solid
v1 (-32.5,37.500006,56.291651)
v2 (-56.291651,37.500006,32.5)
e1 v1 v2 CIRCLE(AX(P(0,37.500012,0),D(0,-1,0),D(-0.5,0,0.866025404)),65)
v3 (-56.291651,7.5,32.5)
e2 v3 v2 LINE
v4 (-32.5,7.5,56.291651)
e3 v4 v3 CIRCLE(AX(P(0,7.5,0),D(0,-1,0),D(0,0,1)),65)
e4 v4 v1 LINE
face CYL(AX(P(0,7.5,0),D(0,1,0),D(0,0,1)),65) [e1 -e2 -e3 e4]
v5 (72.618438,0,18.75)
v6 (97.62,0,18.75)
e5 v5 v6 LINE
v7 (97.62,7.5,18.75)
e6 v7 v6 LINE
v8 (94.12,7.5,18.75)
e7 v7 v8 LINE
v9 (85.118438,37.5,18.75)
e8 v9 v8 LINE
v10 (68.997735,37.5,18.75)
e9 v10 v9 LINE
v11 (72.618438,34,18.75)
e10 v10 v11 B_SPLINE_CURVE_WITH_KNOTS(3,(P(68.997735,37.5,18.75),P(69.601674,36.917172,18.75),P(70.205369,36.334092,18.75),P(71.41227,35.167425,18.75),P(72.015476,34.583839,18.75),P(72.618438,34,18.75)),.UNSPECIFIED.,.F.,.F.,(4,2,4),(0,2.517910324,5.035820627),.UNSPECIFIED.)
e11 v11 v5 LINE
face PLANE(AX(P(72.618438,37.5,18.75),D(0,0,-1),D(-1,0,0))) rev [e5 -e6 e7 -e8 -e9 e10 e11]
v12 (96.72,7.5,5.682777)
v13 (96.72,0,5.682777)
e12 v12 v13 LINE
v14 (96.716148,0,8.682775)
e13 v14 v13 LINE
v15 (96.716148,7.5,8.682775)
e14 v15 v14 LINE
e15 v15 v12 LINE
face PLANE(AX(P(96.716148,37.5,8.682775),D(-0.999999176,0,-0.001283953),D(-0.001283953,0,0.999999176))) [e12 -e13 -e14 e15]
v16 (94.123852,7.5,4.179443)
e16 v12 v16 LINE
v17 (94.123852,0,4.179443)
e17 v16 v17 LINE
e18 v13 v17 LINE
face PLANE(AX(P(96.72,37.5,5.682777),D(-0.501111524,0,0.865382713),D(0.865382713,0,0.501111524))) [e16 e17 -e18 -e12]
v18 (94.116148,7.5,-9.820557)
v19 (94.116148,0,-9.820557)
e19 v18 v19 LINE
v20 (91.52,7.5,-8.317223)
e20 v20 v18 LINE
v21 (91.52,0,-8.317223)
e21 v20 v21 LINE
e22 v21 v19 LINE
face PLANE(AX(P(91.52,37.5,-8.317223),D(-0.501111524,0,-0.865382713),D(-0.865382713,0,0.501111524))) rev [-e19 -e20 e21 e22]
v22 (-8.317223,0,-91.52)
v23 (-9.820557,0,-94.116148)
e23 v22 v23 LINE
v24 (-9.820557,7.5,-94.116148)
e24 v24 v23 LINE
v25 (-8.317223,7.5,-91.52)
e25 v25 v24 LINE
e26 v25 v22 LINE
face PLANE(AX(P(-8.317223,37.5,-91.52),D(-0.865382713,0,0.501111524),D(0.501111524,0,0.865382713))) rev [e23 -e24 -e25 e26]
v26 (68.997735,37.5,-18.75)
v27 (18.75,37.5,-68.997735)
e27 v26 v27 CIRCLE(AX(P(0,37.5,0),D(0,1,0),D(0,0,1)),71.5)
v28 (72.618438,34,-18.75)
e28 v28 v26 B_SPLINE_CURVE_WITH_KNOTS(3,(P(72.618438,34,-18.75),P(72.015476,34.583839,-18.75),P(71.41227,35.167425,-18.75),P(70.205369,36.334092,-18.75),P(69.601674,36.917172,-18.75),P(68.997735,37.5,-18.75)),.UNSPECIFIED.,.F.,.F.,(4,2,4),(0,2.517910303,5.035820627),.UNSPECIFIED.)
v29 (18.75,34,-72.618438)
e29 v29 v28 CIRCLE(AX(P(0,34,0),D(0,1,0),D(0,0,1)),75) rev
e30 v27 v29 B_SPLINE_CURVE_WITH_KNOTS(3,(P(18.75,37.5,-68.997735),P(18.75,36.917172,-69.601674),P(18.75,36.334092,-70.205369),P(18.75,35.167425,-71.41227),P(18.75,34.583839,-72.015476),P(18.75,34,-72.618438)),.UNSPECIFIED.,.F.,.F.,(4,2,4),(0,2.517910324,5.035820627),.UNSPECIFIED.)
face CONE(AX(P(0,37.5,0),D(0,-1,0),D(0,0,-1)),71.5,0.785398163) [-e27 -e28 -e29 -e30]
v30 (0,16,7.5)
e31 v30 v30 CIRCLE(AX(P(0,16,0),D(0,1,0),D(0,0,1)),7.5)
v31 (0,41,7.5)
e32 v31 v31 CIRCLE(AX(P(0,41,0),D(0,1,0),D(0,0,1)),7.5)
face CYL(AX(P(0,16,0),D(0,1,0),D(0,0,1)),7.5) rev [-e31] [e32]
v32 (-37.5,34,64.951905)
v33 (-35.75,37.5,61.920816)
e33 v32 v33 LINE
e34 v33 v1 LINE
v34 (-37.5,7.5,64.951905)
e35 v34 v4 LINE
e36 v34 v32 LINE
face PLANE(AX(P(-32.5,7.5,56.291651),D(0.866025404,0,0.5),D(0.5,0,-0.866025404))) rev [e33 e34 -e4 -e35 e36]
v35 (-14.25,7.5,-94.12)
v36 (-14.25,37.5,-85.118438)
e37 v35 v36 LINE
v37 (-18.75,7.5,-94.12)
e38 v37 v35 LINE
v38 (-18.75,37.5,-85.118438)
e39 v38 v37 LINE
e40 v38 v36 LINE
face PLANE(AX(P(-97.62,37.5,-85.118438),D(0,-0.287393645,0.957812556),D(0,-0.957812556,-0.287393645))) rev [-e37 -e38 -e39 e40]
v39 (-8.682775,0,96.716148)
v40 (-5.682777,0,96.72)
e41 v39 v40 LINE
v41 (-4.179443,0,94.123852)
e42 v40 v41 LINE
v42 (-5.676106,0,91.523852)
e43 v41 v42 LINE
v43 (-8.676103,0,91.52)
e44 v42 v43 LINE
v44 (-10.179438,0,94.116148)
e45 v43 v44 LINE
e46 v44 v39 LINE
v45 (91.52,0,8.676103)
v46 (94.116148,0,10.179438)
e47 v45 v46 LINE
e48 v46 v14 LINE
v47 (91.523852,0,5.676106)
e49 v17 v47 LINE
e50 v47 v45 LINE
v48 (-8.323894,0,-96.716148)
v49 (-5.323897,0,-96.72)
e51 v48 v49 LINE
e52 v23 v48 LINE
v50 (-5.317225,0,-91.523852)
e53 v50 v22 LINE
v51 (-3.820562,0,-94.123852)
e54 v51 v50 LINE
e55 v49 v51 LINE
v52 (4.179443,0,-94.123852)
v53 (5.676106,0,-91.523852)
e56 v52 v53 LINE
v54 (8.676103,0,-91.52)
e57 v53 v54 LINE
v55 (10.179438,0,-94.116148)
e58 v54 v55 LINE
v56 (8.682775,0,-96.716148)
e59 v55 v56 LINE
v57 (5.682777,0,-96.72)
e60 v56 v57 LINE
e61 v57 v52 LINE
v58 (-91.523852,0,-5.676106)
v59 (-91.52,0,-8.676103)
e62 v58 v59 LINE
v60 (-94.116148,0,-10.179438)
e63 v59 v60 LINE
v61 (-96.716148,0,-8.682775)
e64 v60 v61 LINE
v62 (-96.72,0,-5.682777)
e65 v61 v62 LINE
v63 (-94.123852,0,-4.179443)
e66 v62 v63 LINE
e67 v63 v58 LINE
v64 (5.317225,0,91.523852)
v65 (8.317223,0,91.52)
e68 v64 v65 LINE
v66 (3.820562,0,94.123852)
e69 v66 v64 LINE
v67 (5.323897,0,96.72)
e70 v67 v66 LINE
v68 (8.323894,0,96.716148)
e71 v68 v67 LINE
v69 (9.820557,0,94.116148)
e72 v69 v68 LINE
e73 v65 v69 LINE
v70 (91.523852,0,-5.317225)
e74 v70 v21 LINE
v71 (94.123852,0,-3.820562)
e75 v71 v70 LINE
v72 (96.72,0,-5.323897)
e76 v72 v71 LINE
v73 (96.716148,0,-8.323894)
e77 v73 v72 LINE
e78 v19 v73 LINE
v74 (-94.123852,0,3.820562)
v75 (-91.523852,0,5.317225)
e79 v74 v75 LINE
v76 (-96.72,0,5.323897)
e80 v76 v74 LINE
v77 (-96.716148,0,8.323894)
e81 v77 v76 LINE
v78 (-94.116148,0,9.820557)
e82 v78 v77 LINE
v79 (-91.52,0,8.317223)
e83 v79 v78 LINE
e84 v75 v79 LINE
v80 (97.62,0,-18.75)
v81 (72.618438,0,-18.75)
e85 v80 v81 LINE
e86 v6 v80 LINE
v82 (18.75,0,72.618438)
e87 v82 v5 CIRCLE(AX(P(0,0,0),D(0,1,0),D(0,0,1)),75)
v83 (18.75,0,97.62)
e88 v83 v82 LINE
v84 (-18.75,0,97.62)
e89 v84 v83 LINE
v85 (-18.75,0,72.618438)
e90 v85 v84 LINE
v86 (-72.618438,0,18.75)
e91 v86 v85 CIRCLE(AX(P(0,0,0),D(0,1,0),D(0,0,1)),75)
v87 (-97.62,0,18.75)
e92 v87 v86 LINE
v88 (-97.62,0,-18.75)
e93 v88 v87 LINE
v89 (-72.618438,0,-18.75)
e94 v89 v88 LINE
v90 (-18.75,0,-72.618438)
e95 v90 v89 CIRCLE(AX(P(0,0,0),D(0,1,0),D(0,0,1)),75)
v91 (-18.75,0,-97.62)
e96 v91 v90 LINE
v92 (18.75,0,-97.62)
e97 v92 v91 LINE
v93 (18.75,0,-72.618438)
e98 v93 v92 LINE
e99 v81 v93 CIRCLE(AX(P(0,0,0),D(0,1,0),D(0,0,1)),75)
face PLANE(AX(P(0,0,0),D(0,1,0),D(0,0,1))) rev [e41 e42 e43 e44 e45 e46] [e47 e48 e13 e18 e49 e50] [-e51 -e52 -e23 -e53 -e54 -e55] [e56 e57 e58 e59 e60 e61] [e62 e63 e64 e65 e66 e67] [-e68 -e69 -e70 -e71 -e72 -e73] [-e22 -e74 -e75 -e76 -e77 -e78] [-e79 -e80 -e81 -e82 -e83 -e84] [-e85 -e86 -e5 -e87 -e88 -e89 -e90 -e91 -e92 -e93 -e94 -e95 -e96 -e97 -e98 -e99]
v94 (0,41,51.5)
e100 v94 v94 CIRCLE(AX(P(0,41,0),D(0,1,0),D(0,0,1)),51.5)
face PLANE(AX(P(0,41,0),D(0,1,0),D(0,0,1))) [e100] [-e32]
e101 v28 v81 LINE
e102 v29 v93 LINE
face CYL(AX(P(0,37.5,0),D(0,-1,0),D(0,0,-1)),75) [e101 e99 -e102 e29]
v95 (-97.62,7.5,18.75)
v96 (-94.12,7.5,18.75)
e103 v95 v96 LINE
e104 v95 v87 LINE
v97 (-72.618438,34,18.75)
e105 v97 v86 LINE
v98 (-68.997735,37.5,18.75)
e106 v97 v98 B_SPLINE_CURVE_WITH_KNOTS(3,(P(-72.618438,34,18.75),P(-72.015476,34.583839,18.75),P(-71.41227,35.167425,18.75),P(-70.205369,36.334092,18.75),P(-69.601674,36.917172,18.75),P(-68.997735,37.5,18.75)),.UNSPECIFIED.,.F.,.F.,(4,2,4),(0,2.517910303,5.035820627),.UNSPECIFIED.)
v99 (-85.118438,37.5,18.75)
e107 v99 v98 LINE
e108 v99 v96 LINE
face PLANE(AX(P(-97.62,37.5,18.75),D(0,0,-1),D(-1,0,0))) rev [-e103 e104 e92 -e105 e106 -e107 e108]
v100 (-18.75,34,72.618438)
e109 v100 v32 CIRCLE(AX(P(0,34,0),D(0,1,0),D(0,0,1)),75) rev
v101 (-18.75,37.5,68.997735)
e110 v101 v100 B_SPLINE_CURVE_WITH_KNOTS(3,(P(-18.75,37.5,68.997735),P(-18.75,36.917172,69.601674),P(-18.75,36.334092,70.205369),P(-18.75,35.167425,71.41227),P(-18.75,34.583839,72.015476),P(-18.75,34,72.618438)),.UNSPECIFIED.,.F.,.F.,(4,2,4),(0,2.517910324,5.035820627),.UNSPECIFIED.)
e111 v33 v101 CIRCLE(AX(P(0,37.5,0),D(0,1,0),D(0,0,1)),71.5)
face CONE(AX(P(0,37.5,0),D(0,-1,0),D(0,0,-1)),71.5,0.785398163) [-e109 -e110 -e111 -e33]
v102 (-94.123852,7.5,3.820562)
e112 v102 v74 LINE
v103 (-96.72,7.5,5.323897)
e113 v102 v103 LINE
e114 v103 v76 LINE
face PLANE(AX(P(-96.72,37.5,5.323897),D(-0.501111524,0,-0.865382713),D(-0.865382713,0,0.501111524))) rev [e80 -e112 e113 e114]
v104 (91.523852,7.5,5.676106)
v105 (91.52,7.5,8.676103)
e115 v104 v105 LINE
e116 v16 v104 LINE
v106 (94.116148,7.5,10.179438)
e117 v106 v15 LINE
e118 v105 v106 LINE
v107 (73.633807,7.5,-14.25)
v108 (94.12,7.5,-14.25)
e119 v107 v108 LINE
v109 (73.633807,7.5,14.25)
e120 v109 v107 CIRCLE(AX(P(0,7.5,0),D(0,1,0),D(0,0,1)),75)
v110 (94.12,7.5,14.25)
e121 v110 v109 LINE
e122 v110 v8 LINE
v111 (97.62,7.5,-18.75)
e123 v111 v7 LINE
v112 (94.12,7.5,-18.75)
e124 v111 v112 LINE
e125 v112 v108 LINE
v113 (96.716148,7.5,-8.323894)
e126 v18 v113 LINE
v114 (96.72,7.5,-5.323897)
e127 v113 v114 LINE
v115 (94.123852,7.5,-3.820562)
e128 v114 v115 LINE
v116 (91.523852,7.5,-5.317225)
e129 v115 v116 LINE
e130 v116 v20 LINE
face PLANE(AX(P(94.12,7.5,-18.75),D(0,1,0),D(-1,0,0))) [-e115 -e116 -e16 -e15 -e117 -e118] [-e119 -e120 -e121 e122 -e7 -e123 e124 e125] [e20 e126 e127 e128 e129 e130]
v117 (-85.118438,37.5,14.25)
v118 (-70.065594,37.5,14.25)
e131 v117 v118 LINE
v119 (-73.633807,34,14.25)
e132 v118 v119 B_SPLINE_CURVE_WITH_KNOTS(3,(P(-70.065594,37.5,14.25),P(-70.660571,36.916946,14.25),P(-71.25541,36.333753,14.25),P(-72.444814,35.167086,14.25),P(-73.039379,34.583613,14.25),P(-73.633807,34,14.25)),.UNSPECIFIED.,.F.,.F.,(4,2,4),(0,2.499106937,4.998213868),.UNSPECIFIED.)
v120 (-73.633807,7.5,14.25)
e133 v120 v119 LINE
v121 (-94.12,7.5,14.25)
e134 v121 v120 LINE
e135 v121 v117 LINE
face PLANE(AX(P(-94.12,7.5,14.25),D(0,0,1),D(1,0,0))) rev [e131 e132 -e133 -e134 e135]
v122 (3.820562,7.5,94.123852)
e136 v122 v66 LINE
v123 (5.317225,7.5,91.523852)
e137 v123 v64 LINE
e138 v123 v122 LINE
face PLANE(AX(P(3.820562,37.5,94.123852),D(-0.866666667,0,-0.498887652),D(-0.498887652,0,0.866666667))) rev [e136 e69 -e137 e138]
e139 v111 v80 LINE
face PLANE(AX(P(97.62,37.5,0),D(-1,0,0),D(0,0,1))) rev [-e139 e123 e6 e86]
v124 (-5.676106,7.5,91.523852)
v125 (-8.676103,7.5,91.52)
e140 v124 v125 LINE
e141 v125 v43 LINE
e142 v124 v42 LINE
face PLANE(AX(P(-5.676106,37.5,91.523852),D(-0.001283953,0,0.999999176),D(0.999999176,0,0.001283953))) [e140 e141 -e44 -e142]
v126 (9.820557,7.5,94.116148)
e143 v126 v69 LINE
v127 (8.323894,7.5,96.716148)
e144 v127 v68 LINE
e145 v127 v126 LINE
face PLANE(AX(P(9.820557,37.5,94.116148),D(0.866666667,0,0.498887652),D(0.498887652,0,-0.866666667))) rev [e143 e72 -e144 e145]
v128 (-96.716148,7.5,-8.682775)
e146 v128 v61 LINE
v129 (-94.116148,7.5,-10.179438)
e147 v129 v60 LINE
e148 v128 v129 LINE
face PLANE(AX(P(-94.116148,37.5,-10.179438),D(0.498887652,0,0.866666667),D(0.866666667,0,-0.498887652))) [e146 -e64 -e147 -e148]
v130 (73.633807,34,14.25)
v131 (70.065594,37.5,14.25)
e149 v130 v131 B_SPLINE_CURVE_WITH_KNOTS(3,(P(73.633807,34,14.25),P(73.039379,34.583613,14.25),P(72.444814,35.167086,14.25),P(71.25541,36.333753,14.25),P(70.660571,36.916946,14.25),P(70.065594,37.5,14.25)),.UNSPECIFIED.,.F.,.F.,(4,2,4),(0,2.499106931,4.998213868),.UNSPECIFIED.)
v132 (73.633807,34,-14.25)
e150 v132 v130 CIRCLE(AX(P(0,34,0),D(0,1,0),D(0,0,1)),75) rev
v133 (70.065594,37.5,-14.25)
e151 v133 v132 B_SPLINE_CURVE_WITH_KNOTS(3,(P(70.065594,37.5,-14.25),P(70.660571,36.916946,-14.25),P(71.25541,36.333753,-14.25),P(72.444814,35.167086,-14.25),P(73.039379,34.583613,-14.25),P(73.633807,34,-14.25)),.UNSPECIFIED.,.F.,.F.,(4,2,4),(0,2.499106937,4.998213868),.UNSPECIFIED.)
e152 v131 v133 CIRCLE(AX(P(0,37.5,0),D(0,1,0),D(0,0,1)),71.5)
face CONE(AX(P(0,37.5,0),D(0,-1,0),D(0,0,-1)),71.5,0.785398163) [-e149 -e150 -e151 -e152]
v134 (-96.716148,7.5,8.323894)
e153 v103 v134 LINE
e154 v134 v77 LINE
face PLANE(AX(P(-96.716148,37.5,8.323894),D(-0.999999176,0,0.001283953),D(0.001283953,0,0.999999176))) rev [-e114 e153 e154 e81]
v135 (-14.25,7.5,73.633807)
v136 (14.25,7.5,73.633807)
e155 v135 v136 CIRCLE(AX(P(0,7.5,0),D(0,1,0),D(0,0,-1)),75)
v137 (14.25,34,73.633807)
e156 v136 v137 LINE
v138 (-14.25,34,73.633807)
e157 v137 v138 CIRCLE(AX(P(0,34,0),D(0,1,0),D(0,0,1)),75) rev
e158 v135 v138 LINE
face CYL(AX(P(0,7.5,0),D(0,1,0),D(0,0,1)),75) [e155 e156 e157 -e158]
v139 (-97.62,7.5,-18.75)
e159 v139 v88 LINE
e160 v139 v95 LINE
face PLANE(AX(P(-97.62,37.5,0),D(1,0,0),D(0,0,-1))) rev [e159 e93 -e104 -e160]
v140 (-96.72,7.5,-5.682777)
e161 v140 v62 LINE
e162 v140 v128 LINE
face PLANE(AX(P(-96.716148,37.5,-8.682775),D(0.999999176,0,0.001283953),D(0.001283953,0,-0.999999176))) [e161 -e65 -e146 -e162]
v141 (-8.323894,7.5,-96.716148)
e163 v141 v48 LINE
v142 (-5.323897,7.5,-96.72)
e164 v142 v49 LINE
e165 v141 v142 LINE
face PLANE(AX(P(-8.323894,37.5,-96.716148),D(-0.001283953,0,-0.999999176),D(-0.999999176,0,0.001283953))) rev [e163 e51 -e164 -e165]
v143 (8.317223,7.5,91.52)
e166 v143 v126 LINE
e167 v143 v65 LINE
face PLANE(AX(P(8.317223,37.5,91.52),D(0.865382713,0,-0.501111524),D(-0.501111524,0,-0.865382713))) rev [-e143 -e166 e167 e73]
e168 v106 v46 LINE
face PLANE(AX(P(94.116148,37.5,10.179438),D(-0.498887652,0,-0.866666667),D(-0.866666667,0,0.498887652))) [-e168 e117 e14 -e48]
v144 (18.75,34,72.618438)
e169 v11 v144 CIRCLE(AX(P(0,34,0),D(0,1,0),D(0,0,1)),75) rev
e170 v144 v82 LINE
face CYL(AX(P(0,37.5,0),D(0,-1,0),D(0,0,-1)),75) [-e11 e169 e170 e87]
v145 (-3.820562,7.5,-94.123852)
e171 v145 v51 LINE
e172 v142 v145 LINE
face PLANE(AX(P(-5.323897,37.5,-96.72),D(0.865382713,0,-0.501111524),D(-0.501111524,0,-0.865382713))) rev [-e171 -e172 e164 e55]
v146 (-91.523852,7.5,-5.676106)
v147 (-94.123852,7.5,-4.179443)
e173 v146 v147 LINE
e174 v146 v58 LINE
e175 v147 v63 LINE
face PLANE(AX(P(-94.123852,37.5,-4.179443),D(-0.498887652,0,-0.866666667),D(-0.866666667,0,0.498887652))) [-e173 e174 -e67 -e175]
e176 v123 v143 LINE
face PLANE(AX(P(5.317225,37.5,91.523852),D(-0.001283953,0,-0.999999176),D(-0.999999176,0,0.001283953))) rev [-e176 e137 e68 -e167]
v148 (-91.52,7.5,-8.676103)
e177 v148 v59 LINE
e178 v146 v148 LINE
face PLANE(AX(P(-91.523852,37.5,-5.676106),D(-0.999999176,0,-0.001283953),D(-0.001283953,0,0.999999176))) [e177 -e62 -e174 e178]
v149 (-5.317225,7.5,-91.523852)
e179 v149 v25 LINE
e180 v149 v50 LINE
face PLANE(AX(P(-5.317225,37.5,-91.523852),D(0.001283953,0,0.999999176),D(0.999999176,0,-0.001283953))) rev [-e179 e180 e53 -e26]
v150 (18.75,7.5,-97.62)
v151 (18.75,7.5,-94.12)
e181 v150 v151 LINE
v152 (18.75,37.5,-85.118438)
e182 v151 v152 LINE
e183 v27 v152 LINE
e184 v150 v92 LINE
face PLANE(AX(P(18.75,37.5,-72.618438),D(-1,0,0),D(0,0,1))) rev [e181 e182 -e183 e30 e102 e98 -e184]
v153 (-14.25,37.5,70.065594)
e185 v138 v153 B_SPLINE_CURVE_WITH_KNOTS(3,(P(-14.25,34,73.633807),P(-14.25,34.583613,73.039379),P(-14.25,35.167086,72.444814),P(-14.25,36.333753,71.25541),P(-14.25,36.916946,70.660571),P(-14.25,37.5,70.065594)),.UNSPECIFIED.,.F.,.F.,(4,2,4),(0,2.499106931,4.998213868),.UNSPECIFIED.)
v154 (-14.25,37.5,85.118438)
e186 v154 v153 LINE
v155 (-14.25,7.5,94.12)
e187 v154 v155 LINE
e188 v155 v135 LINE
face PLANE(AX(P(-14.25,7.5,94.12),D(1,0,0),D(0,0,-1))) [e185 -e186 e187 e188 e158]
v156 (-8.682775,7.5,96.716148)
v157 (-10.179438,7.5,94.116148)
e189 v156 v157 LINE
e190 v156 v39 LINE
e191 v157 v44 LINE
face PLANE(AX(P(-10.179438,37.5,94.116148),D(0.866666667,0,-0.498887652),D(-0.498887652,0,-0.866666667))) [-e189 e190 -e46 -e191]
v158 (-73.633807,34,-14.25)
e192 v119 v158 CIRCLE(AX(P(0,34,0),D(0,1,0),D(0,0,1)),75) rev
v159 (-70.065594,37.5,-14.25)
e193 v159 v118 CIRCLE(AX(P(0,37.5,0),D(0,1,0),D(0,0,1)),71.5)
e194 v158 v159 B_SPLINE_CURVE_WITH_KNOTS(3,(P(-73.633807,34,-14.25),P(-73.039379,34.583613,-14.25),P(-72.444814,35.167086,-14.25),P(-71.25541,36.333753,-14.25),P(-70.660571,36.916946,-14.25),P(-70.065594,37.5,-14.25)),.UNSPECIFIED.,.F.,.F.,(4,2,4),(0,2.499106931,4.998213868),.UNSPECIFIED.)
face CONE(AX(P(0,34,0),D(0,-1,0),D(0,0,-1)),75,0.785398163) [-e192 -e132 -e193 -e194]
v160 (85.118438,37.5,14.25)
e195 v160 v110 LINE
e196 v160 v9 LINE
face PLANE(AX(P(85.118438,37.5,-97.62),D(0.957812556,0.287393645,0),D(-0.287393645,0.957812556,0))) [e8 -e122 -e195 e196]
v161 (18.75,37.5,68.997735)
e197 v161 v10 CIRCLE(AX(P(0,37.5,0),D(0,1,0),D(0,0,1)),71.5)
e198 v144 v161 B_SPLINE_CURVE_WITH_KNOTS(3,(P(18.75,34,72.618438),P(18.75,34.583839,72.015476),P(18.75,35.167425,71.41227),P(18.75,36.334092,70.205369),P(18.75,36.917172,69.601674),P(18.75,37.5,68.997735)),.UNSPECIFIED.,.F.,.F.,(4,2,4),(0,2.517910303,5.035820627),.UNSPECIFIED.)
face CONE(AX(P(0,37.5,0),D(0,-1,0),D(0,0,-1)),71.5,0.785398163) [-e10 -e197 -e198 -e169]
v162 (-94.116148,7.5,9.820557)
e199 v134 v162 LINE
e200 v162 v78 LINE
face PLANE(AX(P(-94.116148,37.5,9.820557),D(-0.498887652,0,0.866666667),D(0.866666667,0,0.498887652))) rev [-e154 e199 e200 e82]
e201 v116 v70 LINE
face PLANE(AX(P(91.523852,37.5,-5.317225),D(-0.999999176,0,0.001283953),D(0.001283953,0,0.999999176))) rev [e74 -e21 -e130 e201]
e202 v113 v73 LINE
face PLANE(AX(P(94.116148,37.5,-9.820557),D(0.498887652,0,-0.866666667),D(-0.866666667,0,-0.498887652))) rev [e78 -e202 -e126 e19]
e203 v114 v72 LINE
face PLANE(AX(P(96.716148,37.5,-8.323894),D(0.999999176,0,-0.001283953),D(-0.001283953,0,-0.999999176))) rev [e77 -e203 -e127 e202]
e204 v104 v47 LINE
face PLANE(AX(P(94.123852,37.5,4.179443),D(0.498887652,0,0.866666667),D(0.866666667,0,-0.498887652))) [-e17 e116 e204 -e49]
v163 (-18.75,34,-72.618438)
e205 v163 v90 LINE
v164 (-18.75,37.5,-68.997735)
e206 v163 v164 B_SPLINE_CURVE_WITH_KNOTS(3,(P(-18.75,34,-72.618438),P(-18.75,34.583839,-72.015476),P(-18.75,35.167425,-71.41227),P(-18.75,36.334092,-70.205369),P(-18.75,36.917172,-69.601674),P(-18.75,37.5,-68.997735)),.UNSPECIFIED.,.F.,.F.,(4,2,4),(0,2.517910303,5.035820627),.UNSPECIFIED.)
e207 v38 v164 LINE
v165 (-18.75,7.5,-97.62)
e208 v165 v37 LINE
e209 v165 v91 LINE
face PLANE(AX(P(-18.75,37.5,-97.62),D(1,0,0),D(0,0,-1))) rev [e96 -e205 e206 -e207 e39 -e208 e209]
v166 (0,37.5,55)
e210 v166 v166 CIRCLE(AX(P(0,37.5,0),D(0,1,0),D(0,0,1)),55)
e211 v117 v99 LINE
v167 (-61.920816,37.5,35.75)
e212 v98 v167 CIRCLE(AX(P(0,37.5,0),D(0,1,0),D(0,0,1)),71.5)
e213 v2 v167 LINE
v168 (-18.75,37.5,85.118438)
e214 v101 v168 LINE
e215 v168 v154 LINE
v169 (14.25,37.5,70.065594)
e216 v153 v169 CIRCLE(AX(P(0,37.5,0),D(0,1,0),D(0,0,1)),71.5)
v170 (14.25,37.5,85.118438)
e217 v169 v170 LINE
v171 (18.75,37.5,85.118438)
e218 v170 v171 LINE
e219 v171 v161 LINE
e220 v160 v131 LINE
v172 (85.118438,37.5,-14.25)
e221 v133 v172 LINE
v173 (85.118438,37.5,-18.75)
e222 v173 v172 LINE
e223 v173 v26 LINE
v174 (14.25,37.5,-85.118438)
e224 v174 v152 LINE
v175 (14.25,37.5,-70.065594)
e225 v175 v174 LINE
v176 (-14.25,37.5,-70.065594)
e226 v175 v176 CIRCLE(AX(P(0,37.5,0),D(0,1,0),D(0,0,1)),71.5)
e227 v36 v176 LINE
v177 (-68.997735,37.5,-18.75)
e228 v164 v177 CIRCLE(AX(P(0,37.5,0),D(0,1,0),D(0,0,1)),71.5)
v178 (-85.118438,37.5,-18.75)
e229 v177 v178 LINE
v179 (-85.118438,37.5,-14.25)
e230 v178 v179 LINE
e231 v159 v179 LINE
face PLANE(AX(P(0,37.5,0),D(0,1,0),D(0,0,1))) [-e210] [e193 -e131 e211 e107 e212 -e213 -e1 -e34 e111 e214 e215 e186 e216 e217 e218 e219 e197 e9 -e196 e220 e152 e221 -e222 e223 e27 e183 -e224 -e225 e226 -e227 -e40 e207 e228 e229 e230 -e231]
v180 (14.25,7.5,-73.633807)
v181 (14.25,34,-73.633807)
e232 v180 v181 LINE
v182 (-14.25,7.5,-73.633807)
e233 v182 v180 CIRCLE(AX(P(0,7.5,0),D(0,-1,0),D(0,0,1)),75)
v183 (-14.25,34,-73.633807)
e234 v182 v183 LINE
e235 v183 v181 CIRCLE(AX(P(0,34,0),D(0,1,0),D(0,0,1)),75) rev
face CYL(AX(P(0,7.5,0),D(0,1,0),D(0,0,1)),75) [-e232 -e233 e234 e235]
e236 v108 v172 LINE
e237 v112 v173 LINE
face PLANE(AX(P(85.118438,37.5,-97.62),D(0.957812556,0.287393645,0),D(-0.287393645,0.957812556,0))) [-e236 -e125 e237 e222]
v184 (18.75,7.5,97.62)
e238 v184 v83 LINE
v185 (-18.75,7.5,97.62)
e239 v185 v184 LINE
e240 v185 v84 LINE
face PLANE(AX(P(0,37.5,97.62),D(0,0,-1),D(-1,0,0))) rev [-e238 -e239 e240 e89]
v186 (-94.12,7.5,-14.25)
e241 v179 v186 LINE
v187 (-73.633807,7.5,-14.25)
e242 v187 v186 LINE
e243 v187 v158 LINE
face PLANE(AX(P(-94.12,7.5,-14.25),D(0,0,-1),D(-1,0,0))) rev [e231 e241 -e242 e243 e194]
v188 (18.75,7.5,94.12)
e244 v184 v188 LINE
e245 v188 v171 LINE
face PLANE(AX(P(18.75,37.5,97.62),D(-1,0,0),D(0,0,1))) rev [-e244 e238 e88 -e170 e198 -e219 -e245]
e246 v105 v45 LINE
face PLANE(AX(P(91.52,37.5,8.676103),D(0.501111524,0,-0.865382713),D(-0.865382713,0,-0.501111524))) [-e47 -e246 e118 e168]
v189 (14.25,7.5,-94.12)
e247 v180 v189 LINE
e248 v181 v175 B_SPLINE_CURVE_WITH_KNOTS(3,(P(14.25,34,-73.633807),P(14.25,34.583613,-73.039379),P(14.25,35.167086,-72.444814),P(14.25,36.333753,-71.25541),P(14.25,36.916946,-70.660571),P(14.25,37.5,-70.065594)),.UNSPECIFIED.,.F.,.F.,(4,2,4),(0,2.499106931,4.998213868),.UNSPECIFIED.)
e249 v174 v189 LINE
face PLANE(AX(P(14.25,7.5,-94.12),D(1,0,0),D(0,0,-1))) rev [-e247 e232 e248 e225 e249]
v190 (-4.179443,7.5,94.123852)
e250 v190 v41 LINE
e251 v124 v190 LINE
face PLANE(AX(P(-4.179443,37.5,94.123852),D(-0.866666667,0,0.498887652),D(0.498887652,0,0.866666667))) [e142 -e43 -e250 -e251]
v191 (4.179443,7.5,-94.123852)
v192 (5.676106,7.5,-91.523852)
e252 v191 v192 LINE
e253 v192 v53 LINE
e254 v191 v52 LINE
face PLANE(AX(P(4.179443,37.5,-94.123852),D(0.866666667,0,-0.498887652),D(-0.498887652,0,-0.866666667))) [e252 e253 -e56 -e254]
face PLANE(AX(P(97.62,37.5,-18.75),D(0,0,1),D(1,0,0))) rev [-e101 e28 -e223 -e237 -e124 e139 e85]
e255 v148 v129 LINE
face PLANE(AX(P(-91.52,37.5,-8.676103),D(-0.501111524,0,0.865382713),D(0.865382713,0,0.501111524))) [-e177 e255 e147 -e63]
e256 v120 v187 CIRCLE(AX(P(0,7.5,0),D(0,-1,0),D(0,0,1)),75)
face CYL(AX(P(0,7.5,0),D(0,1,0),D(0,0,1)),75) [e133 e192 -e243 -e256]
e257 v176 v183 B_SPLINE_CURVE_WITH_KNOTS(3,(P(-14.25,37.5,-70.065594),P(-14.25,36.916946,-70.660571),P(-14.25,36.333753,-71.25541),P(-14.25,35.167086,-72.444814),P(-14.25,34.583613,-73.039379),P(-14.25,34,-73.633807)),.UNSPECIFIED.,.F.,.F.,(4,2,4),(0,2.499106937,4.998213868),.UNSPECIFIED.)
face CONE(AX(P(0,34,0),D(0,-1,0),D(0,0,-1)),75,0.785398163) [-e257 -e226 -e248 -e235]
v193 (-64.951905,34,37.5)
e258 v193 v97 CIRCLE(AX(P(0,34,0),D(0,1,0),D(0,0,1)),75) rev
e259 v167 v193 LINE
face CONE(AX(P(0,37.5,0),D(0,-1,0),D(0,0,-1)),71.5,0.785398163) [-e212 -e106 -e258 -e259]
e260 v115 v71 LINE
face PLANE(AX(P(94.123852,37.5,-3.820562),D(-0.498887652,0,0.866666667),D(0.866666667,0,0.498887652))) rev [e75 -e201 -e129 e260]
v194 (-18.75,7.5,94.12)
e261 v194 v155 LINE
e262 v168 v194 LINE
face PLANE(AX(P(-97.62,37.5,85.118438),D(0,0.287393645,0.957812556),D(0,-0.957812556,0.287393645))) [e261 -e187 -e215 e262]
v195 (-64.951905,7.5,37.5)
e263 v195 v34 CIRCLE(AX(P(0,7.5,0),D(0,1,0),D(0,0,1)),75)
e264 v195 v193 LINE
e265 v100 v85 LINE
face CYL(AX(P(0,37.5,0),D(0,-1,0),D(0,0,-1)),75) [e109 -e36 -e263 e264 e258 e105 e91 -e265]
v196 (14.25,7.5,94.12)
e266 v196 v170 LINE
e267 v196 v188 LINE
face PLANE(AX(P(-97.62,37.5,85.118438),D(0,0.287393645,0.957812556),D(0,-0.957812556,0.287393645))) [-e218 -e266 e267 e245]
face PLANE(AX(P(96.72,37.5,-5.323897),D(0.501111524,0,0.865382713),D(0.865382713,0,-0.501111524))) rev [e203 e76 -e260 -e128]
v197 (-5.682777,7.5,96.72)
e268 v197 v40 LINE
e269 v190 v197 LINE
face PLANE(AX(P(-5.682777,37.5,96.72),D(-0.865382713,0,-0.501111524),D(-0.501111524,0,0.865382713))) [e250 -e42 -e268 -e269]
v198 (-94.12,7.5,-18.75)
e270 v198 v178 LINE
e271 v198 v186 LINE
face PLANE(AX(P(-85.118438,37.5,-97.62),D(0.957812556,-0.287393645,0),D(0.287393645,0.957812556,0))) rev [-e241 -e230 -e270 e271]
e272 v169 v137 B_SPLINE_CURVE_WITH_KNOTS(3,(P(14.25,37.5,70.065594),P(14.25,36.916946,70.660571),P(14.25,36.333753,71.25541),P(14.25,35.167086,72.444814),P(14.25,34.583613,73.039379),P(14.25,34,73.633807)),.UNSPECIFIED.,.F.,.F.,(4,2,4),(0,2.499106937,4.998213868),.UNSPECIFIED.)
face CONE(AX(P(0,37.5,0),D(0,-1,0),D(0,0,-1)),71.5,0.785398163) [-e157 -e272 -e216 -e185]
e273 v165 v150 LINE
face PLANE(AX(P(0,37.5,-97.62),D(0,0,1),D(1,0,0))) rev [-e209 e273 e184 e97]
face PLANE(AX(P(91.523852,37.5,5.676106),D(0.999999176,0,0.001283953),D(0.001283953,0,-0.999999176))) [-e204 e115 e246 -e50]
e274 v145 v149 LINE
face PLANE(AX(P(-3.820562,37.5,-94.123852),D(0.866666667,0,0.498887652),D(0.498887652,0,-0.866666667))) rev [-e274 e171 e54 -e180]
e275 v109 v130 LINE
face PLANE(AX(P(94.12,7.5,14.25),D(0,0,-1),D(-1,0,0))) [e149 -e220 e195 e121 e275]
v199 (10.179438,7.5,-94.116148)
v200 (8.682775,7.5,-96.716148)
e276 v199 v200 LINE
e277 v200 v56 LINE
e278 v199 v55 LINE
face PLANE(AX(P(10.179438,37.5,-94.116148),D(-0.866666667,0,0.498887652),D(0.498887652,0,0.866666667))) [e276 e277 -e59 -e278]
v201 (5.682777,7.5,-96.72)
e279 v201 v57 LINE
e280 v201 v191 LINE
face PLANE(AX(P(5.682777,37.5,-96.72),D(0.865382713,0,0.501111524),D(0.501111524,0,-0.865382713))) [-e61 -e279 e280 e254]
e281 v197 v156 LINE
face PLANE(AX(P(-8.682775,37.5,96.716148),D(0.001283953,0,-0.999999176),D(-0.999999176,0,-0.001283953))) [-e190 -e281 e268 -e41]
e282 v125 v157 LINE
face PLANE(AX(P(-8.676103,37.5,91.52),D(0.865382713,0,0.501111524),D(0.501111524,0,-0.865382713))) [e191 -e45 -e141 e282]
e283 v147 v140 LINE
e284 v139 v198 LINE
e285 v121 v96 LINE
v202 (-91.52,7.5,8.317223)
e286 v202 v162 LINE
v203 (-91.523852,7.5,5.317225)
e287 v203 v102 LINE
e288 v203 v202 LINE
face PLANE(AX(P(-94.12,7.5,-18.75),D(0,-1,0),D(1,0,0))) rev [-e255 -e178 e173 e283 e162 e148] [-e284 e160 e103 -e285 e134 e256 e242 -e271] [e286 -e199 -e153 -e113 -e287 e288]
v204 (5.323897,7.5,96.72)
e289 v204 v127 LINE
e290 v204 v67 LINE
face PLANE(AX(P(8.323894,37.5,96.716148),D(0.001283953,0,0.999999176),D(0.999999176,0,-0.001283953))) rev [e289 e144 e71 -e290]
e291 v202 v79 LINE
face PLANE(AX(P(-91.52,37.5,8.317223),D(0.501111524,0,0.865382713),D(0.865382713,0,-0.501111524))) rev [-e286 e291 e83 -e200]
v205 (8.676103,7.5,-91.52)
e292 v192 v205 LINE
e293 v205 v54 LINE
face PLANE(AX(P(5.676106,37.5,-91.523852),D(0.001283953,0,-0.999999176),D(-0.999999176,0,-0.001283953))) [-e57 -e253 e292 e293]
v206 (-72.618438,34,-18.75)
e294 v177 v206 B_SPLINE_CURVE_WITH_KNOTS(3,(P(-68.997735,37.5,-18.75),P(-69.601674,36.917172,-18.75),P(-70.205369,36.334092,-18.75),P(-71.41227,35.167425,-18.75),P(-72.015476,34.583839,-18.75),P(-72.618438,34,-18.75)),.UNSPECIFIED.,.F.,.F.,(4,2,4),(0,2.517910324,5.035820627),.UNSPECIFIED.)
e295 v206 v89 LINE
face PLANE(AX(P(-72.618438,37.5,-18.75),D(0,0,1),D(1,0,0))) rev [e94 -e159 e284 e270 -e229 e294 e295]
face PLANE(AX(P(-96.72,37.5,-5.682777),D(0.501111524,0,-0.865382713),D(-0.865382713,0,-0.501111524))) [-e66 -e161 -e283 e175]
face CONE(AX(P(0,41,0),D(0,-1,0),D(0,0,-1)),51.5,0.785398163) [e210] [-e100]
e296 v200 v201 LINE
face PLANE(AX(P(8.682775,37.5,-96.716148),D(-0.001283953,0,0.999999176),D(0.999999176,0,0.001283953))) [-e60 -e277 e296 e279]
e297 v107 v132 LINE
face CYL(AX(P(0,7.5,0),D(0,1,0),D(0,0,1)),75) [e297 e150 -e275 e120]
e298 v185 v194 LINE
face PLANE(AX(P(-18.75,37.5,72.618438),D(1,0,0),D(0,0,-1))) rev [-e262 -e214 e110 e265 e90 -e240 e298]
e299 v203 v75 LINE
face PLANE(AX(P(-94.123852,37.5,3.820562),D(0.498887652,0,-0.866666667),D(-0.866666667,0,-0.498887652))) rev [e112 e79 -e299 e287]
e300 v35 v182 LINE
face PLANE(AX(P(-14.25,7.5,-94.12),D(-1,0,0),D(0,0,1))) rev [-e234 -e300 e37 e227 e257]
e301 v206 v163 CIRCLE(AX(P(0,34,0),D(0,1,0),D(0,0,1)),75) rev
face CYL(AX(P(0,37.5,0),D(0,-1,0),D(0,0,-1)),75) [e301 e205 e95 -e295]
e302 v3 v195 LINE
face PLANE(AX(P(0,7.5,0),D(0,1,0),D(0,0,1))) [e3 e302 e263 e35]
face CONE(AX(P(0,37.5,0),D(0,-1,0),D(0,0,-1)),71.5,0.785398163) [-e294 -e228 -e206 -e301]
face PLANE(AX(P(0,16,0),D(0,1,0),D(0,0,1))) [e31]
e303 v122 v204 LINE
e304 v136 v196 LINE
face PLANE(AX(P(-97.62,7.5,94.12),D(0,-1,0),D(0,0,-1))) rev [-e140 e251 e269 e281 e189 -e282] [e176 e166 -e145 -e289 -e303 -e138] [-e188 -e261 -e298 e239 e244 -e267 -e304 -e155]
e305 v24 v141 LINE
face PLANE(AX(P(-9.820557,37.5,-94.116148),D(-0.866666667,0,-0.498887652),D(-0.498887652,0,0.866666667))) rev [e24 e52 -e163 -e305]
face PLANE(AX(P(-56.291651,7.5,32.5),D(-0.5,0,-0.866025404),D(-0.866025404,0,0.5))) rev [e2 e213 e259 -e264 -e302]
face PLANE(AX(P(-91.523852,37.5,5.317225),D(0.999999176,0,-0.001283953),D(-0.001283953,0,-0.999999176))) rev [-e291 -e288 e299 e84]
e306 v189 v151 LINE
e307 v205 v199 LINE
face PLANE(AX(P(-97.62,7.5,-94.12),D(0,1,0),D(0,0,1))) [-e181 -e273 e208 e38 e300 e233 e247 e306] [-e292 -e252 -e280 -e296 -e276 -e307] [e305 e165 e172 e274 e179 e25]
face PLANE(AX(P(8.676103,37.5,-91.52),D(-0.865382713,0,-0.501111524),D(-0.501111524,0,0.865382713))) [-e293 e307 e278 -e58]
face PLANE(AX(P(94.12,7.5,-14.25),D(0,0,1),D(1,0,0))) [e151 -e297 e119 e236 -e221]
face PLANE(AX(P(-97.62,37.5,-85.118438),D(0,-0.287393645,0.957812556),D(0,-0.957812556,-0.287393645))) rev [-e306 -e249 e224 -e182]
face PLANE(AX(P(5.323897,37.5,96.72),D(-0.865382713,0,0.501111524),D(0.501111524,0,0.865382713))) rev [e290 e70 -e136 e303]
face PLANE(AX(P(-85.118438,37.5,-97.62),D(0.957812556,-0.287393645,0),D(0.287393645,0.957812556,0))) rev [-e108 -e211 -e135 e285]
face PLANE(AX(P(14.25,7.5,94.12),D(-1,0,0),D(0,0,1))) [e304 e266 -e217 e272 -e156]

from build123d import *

# Parameters (mm, degrees)
BOSS_EXTRUDE1_DEPTH                      = 37.5
SKETCH4_W                                = 3.5
SKETCH4_H                                = 30
CUT_EXTRUDE1_DEPTH                       = 37.5
SKETCH7_W                                = 3.5
SKETCH7_H                                = 30
CUT_EXTRUDE3_DEPTH                       = 157.454118834
CUT_EXTRUDE4_START                       = -30
CUT_EXTRUDE4_DEPTH                       = 30
CHAMFER1_SIZE                            = 3.5
CUT_EXTRUDE5_DEPTH                       = 157.454118834
MIRROR4_AT_THE_SECOND_PLANE_COPY_1_DEPTH = 157.454118834
CUT_EXTRUDE6_DEPTH                       = 157.454118834
CUT_EXTRUDE7_DEPTH                       = 144.057956088
CUT_EXTRUDE7_DEPTH_BACK                  = 30
SKETCH14_R                               = 55
BOSS_EXTRUDE3_DEPTH                      = 3.5
CHAMFER2_SIZE                            = 3.5
SKETCH15_R                               = 7.5
CUT_EXTRUDE8_DEPTH                       = 25


with BuildPart() as part:
    # Sketch2 → Boss-Extrude1 (new body)
    with BuildSketch(Plane(origin=(0, 0, 0), x_dir=(1, 0, 0), z_dir=(0, 1, 0))):
        with BuildLine():
            Line((97.62, 0), (97.62, 18.75))
            Line((97.62, 18.75), (72.618437741, 18.75))
            ThreePointArc((72.618437741, 18.75), (53.033008589, 53.033008589), (18.75, 72.618437741))
            Line((18.75, 72.618437741), (18.75, 97.62))
            Line((18.75, 97.62), (0, 97.62))
            Line((0, 97.62), (-18.75, 97.62))
            Line((-18.75, 97.62), (-18.75, 72.618437741))
            ThreePointArc((-18.75, 72.618437741), (-53.033008589, 53.033008589), (-72.618437741, 18.75))
            Line((-72.618437741, 18.75), (-97.62, 18.75))
            Line((-97.62, 18.75), (-97.62, 0))
            Line((-97.62, 0), (-97.62, -18.75))
            Line((-97.62, -18.75), (-72.618437741, -18.75))
            ThreePointArc((-72.618437741, -18.75), (-53.033008589, -53.033008589), (-18.75, -72.618437741))
            Line((-18.75, -72.618437741), (-18.75, -97.62))
            Line((-18.75, -97.62), (0, -97.62))
            Line((0, -97.62), (18.75, -97.62))
            Line((18.75, -97.62), (18.75, -72.618437741))
            ThreePointArc((18.75, -72.618437741), (53.033008589, -53.033008589), (72.618437741, -18.75))
            Line((72.618437741, -18.75), (97.62, -18.75))
            Line((97.62, -18.75), (97.62, 0))
        make_face()
        Polygon((8.323894459, -96.71614814), (5.323896931, -96.72), (3.820562359, -94.12385186), (5.317225314, -91.52385186), (8.317222841, -91.52), (9.820557413, -94.11614814), align=None, mode=Mode.SUBTRACT)
        Polygon((-5.682777159, -96.72), (-4.179442587, -94.12385186), (-5.676105541, -91.52385186), (-8.676103069, -91.52), (-10.179437641, -94.11614814), (-8.682774686, -96.71614814), align=None, mode=Mode.SUBTRACT)
        Polygon((-96.71614814, -8.323894459), (-96.72, -5.323896931), (-94.12385186, -3.820562359), (-91.52385186, -5.317225314), (-91.52, -8.317222841), (-94.11614814, -9.820557413), align=None, mode=Mode.SUBTRACT)
        Polygon((96.72, -5.682777159), (94.12385186, -4.179442587), (91.52385186, -5.676105541), (91.52, -8.676103069), (94.11614814, -10.179437641), (96.71614814, -8.682774686), align=None, mode=Mode.SUBTRACT)
        Polygon((96.71614814, 8.323894459), (96.72, 5.323896931), (94.12385186, 3.820562359), (91.52385186, 5.317225314), (91.52, 8.317222841), (94.11614814, 9.820557413), align=None, mode=Mode.SUBTRACT)
        Polygon((-96.72, 5.682777159), (-94.12385186, 4.179442587), (-91.52385186, 5.676105541), (-91.52, 8.676103069), (-94.11614814, 10.179437641), (-96.71614814, 8.682774686), align=None, mode=Mode.SUBTRACT)
        Polygon((-8.323894459, 96.71614814), (-5.323896931, 96.72), (-3.820562359, 94.12385186), (-5.317225314, 91.52385186), (-8.317222841, 91.52), (-9.820557413, 94.11614814), align=None, mode=Mode.SUBTRACT)
        Polygon((5.682777159, 96.72), (4.179442587, 94.12385186), (5.676105541, 91.52385186), (8.676103069, 91.52), (10.179437641, 94.11614814), (8.682774686, 96.71614814), align=None, mode=Mode.SUBTRACT)
    extrude(amount=BOSS_EXTRUDE1_DEPTH)

    # Sketch4 → Cut-Extrude1 (cut)
    with BuildSketch(Plane.XY.offset(18.75)):
        with Locations((-95.87, 22.5)):
            Rectangle(SKETCH4_W, SKETCH4_H)
    cut_extrude1 = extrude(amount=-CUT_EXTRUDE1_DEPTH, mode=Mode.SUBTRACT)

    # Sketch7 → Cut-Extrude3 (cut, through all)
    with BuildSketch(Plane(origin=(18.75, 0, 0), x_dir=(0, 0, -1), z_dir=(1, 0, 0))):
        with Locations((-95.87, 22.5)):
            Rectangle(SKETCH7_W, SKETCH7_H)
    cut_extrude3 = extrude(amount=-CUT_EXTRUDE3_DEPTH, mode=Mode.SUBTRACT)

    # Mirror1: Cut-Extrude3 across plane
    add(cut_extrude3.mirror(Plane.XY), mode=Mode.SUBTRACT)

    # Mirror2: Cut-Extrude1 across plane
    add(cut_extrude1.mirror(Plane.ZY), mode=Mode.SUBTRACT)

    # Sketch8 → Cut-Extrude4 (cut)
    with BuildSketch(Plane(origin=(0, 37.5, 0), x_dir=(1, 0, 0), z_dir=(0, 1, 0)).offset(CUT_EXTRUDE4_START)):
        with BuildLine():
            Line((-14.25, 94.12), (-14.25, 73.633806774))
            ThreePointArc((-14.25, 73.633806774), (0, 75), (14.25, 73.633806774))
            Line((14.25, 73.633806774), (14.25, 94.12))
            Line((14.25, 94.12), (-14.25, 94.12))
        make_face()
        with BuildLine():
            Line((-94.12, 14.25), (-94.12, -14.25))
            Line((-94.12, -14.25), (-73.633806774, -14.25))
            ThreePointArc((-73.633806774, -14.25), (-75, 0), (-73.633806774, 14.25))
            Line((-73.633806774, 14.25), (-94.12, 14.25))
        make_face()
    cut_extrude4 = extrude(amount=CUT_EXTRUDE4_DEPTH, mode=Mode.SUBTRACT)

    # Mirror3: Cut-Extrude4 across plane
    add(cut_extrude4.mirror(Plane.ZY), mode=Mode.SUBTRACT)

    # Mirror3 at the second plane: Cut-Extrude4 across plane
    add(cut_extrude4.mirror(Plane.XY), mode=Mode.SUBTRACT)

    # Chamfer1
    chamfer1_edges = [part.edges().sort_by_distance(p)[0] for p in [
        (53.033008589, 37.5, -53.033008589),
        (0, 37.5, -75),
        (-75, 37.5, 0),
        (0, 37.5, 75),
        (-53.033008589, 37.5, -53.033008589),
        (75, 37.5, 0),
        (-53.033008589, 37.5, 53.033008589),
        (53.033008589, 37.5, 53.033008589),
    ]]
    chamfer(chamfer1_edges, length=CHAMFER1_SIZE)

    # Sketch9 → Cut-Extrude5 (cut, symmetric)
    with BuildSketch(Plane(origin=(18.75, 0, 0), x_dir=(0, 0, -1), z_dir=(1, 0, 0))):
        Polygon((-85.118437741, 37.5), (-94.12, 7.5), (-94.12, 37.5), align=None)
    cut_extrude5 = extrude(amount=CUT_EXTRUDE5_DEPTH, both=True, mode=Mode.SUBTRACT)

    # Mirror4: Cut-Extrude5 across plane
    add(cut_extrude5.mirror(Plane.ZY), mode=Mode.SUBTRACT)

    # Mirror4 at the second plane: Cut-Extrude5 across plane
    add(cut_extrude5.mirror(Plane.XY), mode=Mode.SUBTRACT)

    # Mirror4 at the second plane copy 1 sketc → Mirror4 at the second plane copy 1 (cut, symmetric)
    with BuildSketch(Plane.ZY.offset(18.75)):
        Polygon((-85.118437741, 37.5), (-94.12, 7.5), (-94.12, 37.5), align=None)
    extrude(amount=MIRROR4_AT_THE_SECOND_PLANE_COPY_1_DEPTH, both=True, mode=Mode.SUBTRACT)

    # Sketch10 → Cut-Extrude6 (cut, symmetric)
    with BuildSketch(Plane.XY.offset(18.75)):
        Polygon((-85.118437741, 37.5), (-94.12, 7.5), (-94.12, 37.5), align=None)
    cut_extrude6 = extrude(amount=CUT_EXTRUDE6_DEPTH, both=True, mode=Mode.SUBTRACT)

    # Mirror5: Cut-Extrude6 across plane
    add(cut_extrude6.mirror(Plane.ZY), mode=Mode.SUBTRACT)

    # Sketch11 → Cut-Extrude7 (cut, two sides: drawn at the far end of the back side and taken through both)
    with BuildSketch(Plane(origin=(0, 37.5, 0), x_dir=(1, 0, 0), z_dir=(0, 1, 0)).offset(-CUT_EXTRUDE7_DEPTH_BACK)):
        with BuildLine():
            Line((-56.291651246, -32.5), (-64.951905284, -37.5))
            ThreePointArc((-64.951905284, -37.5), (-53.033008589, -53.033008589), (-37.5, -64.951905284))
            Line((-37.5, -64.951905284), (-32.5, -56.291651246))
            ThreePointArc((-32.5, -56.291651246), (-45.961940777, -45.961940777), (-56.291651246, -32.5))
        make_face()
    extrude(amount=CUT_EXTRUDE7_DEPTH + CUT_EXTRUDE7_DEPTH_BACK, mode=Mode.SUBTRACT)

    # Sketch14 → Boss-Extrude3 (add)
    with BuildSketch(Plane(origin=(0, 37.5, 0), x_dir=(1, 0, 0), z_dir=(0, 1, 0))):
        with Locations(Location((0, 0, 0), (0, 0, 270))):
            Circle(SKETCH14_R)
    extrude(amount=BOSS_EXTRUDE3_DEPTH)

    # Chamfer2
    chamfer2_edges = [part.edges().sort_by_distance(p)[0] for p in [
        (0, 41, -55),
    ]]
    chamfer(chamfer2_edges, length=CHAMFER2_SIZE - 0.0001)  # a hair under: the kernel refuses the full size

    # Sketch15 → Cut-Extrude8 (cut)
    with BuildSketch(Plane(origin=(0, 41, 0), x_dir=(1, 0, 0), z_dir=(0, 1, 0))):
        with Locations(Location((0, 0, 0), (0, 0, 270))):
            Circle(SKETCH15_R)
    extrude(amount=-CUT_EXTRUDE8_DEPTH, mode=Mode.SUBTRACT)


solid = part.part
